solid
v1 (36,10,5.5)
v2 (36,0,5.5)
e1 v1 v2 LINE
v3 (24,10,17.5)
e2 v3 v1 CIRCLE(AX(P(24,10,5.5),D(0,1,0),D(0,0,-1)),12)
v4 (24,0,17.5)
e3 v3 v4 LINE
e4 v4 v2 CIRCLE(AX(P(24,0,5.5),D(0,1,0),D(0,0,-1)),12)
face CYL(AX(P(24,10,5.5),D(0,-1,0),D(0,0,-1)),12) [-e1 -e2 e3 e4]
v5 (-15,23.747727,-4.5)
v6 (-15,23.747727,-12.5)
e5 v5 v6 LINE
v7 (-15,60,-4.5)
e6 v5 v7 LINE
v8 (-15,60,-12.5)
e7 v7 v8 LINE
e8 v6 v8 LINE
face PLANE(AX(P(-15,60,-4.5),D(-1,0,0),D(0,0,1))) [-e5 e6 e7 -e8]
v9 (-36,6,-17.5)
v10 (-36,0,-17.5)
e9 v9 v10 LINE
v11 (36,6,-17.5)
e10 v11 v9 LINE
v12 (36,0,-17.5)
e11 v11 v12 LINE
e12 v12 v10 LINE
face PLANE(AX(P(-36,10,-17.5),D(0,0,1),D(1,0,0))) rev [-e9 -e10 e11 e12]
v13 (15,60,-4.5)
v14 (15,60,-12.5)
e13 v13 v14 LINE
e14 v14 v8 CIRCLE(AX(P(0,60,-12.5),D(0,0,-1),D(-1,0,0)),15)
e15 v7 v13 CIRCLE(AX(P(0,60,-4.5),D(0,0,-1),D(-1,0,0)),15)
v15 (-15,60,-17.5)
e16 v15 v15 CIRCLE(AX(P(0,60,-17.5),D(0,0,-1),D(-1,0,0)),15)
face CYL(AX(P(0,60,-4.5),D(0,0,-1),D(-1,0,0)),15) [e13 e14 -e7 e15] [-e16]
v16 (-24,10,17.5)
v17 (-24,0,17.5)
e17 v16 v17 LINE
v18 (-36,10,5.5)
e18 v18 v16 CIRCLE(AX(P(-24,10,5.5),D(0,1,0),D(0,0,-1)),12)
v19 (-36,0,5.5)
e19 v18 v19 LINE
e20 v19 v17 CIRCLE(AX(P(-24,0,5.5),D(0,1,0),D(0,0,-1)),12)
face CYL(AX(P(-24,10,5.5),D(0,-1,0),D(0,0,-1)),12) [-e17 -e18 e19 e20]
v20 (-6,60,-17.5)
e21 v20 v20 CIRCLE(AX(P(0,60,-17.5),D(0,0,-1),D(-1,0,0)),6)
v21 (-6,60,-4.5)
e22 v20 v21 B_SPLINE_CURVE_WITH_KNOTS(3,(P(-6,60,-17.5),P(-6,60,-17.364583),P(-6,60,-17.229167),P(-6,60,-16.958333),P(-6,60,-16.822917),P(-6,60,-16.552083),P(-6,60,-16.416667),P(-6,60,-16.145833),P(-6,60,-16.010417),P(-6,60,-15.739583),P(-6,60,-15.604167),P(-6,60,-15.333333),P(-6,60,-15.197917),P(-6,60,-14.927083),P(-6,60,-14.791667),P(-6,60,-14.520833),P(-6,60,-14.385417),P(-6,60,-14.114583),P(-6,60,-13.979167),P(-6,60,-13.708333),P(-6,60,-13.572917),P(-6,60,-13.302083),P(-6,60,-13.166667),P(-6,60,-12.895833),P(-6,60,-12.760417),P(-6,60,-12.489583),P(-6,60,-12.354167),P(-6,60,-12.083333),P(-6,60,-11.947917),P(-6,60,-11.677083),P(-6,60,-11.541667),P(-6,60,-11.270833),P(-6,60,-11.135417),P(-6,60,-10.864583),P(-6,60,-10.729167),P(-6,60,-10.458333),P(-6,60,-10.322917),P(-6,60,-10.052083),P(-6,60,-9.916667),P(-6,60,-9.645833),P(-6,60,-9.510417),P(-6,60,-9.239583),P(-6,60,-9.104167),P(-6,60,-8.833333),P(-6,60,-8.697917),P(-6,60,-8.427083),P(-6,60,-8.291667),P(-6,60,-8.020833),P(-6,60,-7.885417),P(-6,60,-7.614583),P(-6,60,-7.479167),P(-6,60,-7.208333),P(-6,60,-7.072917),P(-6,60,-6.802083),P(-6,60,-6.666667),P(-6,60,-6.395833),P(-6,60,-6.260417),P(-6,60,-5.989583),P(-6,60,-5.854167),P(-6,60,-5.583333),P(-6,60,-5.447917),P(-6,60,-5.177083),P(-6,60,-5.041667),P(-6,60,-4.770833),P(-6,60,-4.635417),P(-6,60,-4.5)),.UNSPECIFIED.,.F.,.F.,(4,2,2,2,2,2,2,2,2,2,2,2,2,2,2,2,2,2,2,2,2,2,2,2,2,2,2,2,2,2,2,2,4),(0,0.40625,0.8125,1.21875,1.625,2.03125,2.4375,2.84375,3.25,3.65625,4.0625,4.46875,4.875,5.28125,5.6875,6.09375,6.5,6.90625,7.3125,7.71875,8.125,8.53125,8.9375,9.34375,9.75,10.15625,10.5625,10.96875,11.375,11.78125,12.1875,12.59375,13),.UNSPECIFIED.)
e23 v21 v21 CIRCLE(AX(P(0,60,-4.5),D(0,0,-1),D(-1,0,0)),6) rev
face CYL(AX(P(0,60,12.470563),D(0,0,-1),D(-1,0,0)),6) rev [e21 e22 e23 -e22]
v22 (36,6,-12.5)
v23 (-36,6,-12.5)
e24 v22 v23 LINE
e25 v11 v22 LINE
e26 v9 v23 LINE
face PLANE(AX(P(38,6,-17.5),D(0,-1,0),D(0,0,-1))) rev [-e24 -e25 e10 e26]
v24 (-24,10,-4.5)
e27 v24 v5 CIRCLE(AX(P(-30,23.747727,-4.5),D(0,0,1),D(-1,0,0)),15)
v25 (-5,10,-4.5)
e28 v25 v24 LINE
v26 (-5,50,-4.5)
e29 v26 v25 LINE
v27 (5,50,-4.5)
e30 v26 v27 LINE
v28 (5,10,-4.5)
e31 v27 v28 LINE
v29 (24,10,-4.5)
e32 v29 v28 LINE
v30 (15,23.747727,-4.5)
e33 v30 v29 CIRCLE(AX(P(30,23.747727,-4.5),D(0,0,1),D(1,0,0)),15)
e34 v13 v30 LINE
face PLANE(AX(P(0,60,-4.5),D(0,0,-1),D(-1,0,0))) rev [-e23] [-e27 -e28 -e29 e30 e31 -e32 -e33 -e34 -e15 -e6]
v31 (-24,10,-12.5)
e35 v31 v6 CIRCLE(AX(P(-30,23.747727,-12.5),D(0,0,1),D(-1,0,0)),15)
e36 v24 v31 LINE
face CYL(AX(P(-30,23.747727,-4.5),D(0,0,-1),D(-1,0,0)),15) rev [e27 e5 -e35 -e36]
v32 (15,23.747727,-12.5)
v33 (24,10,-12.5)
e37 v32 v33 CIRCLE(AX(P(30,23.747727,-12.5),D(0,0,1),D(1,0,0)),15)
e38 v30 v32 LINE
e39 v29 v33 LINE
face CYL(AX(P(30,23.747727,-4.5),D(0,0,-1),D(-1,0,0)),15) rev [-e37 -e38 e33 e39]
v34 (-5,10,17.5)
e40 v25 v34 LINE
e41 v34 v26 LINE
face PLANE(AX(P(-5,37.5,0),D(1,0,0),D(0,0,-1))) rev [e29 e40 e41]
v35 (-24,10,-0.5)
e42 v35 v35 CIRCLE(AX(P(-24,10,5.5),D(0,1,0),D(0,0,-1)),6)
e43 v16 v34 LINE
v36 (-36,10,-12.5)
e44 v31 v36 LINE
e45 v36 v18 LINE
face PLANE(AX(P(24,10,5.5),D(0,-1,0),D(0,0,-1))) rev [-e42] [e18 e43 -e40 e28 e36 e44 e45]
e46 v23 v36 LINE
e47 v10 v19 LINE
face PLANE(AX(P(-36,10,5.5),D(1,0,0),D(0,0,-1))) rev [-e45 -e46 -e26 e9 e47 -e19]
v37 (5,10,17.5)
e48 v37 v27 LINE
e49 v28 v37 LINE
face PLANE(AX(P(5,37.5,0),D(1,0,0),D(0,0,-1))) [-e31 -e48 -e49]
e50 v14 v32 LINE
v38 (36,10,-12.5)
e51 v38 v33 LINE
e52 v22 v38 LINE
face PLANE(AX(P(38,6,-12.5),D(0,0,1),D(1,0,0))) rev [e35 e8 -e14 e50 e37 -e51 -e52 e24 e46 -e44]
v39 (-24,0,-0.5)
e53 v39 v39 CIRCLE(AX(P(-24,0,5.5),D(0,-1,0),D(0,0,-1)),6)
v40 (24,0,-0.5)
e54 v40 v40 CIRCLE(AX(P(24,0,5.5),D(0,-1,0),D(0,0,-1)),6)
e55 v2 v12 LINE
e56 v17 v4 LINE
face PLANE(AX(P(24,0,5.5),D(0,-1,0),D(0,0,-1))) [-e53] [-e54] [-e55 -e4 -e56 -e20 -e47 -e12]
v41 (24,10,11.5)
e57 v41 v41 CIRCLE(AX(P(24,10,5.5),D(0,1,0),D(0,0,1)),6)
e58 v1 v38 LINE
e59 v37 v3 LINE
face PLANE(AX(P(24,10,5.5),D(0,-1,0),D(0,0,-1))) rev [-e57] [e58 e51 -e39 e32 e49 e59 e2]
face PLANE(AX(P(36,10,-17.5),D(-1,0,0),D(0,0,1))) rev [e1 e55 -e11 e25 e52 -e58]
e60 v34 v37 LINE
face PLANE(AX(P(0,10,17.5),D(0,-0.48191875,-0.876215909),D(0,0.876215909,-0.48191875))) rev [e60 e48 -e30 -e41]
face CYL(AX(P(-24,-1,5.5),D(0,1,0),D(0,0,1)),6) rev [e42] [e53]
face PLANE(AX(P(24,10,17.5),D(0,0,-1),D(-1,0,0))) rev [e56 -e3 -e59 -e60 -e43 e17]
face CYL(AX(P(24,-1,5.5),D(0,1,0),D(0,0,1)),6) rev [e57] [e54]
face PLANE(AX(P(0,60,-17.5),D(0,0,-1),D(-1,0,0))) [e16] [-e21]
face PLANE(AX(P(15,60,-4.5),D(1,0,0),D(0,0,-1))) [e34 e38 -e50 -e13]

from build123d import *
from build123d.topology import SkipClean

# Parameters (mm, degrees)
BOSS_EXTRUDE1_DEPTH = 10
SKETCH3_W           = 5
SKETCH3_H           = 4
CUT_EXTRUDE1_DEPTH  = 74
BOSS_EXTRUDE2_DEPTH = 8
BOSS_EXTRUDE3_START = 5
SKETCH5_R           = 15
BOSS_EXTRUDE3_DEPTH = 5
SKETCH6_R           = 6
CUT_EXTRUDE2_DEPTH  = 13
RIB1_START          = -5
RIB1_DEPTH          = 10
SKETCH8_R           = 6
CUT_EXTRUDE4_DEPTH  = 11


# Read off the part's stored shape, not the designer's step: Rib1
with BuildPart() as part:
    # Sketch1 → Boss-Extrude1 (new body)
    with BuildSketch(Plane(origin=(0, 0, 0), x_dir=(1, 0, 0), z_dir=(0, 1, 0))):
        with BuildLine():
            Line((-36, 17.5), (36, 17.5))
            Line((36, 17.5), (36, -5.5))
            ThreePointArc((36, -5.5), (32.485281374, -13.985281374), (24, -17.5))
            Line((24, -17.5), (-24, -17.5))
            ThreePointArc((-24, -17.5), (-32.485281374, -13.985281374), (-36, -5.5))
            Line((-36, -5.5), (-36, 17.5))
        make_face()
    extrude(amount=BOSS_EXTRUDE1_DEPTH)

    # Sketch3 → Cut-Extrude1 (cut)
    with BuildSketch(Plane.ZY.offset(36)):
        with Locations((-15, 8)):
            Rectangle(SKETCH3_W, SKETCH3_H)
    extrude(amount=-CUT_EXTRUDE1_DEPTH, mode=Mode.SUBTRACT)

    # Sketch4 → Boss-Extrude2 (add)
    with BuildSketch(Plane(origin=(0, 0, -12.5), x_dir=(-1, 0, 0), z_dir=(0, 0, -1))):
        with BuildLine():
            Line((15, 60), (15, 23.747727085))
            ThreePointArc((15, 23.747727085), (17.450099602, 15.531888722), (24, 10))
            Line((24, 10), (-24, 10))
            ThreePointArc((-24, 10), (-17.450099602, 15.531888722), (-15, 23.747727085))
            Line((-15, 23.747727085), (-15, 60))
            ThreePointArc((-15, 60), (0, 75), (15, 60))
        make_face()
    extrude(amount=-BOSS_EXTRUDE2_DEPTH)

    # Sketch5 → Boss-Extrude3 (add)
    with SkipClean():  # the faces are left unmerged after this step: merging them gives an invalid solid
        with BuildSketch(Plane(origin=(0, 0, -12.5), x_dir=(-1, 0, 0), z_dir=(0, 0, -1)).offset(BOSS_EXTRUDE3_START)):
            with Locations((0, 60)):
                Circle(SKETCH5_R)
        extrude(amount=-BOSS_EXTRUDE3_DEPTH)

    # Sketch6 → Cut-Extrude2 (cut)
    with SkipClean():  # the faces are left unmerged after this step: merging them gives an invalid solid
        with BuildSketch(Plane(origin=(0, 0, -17.5), x_dir=(-1, 0, 0), z_dir=(0, 0, -1))):
            with Locations((0, 60)):
                Circle(SKETCH6_R)
        extrude(amount=-CUT_EXTRUDE2_DEPTH, mode=Mode.SUBTRACT)

    # Rib1 outline → Rib1 (add)
    with SkipClean():  # the faces are left unmerged after this step: merging them gives an invalid solid
        with BuildSketch(Plane(origin=(0, 0, 0), x_dir=(0, 0, -1), z_dir=(1, 0, 0)).offset(RIB1_START)):
            Polygon((4.5, 50), (-17.5, 10), (4.5, 10), align=None)
        extrude(amount=RIB1_DEPTH)

    # Sketch8 → Cut-Extrude4 (cut)
    with SkipClean():  # the faces are left unmerged after this step: merging them gives an invalid solid
        with BuildSketch(Plane(origin=(0, 10, 0), x_dir=(1, 0, 0), z_dir=(0, 1, 0))):
            with Locations(Location((24, -5.5, 0), (0, 0, 270))):
                Circle(SKETCH8_R)
            with Locations(Location((-24, -5.5, 0), (0, 0, 90))):
                Circle(SKETCH8_R)
        extrude(amount=-CUT_EXTRUDE4_DEPTH, mode=Mode.SUBTRACT)


solid = part.part
